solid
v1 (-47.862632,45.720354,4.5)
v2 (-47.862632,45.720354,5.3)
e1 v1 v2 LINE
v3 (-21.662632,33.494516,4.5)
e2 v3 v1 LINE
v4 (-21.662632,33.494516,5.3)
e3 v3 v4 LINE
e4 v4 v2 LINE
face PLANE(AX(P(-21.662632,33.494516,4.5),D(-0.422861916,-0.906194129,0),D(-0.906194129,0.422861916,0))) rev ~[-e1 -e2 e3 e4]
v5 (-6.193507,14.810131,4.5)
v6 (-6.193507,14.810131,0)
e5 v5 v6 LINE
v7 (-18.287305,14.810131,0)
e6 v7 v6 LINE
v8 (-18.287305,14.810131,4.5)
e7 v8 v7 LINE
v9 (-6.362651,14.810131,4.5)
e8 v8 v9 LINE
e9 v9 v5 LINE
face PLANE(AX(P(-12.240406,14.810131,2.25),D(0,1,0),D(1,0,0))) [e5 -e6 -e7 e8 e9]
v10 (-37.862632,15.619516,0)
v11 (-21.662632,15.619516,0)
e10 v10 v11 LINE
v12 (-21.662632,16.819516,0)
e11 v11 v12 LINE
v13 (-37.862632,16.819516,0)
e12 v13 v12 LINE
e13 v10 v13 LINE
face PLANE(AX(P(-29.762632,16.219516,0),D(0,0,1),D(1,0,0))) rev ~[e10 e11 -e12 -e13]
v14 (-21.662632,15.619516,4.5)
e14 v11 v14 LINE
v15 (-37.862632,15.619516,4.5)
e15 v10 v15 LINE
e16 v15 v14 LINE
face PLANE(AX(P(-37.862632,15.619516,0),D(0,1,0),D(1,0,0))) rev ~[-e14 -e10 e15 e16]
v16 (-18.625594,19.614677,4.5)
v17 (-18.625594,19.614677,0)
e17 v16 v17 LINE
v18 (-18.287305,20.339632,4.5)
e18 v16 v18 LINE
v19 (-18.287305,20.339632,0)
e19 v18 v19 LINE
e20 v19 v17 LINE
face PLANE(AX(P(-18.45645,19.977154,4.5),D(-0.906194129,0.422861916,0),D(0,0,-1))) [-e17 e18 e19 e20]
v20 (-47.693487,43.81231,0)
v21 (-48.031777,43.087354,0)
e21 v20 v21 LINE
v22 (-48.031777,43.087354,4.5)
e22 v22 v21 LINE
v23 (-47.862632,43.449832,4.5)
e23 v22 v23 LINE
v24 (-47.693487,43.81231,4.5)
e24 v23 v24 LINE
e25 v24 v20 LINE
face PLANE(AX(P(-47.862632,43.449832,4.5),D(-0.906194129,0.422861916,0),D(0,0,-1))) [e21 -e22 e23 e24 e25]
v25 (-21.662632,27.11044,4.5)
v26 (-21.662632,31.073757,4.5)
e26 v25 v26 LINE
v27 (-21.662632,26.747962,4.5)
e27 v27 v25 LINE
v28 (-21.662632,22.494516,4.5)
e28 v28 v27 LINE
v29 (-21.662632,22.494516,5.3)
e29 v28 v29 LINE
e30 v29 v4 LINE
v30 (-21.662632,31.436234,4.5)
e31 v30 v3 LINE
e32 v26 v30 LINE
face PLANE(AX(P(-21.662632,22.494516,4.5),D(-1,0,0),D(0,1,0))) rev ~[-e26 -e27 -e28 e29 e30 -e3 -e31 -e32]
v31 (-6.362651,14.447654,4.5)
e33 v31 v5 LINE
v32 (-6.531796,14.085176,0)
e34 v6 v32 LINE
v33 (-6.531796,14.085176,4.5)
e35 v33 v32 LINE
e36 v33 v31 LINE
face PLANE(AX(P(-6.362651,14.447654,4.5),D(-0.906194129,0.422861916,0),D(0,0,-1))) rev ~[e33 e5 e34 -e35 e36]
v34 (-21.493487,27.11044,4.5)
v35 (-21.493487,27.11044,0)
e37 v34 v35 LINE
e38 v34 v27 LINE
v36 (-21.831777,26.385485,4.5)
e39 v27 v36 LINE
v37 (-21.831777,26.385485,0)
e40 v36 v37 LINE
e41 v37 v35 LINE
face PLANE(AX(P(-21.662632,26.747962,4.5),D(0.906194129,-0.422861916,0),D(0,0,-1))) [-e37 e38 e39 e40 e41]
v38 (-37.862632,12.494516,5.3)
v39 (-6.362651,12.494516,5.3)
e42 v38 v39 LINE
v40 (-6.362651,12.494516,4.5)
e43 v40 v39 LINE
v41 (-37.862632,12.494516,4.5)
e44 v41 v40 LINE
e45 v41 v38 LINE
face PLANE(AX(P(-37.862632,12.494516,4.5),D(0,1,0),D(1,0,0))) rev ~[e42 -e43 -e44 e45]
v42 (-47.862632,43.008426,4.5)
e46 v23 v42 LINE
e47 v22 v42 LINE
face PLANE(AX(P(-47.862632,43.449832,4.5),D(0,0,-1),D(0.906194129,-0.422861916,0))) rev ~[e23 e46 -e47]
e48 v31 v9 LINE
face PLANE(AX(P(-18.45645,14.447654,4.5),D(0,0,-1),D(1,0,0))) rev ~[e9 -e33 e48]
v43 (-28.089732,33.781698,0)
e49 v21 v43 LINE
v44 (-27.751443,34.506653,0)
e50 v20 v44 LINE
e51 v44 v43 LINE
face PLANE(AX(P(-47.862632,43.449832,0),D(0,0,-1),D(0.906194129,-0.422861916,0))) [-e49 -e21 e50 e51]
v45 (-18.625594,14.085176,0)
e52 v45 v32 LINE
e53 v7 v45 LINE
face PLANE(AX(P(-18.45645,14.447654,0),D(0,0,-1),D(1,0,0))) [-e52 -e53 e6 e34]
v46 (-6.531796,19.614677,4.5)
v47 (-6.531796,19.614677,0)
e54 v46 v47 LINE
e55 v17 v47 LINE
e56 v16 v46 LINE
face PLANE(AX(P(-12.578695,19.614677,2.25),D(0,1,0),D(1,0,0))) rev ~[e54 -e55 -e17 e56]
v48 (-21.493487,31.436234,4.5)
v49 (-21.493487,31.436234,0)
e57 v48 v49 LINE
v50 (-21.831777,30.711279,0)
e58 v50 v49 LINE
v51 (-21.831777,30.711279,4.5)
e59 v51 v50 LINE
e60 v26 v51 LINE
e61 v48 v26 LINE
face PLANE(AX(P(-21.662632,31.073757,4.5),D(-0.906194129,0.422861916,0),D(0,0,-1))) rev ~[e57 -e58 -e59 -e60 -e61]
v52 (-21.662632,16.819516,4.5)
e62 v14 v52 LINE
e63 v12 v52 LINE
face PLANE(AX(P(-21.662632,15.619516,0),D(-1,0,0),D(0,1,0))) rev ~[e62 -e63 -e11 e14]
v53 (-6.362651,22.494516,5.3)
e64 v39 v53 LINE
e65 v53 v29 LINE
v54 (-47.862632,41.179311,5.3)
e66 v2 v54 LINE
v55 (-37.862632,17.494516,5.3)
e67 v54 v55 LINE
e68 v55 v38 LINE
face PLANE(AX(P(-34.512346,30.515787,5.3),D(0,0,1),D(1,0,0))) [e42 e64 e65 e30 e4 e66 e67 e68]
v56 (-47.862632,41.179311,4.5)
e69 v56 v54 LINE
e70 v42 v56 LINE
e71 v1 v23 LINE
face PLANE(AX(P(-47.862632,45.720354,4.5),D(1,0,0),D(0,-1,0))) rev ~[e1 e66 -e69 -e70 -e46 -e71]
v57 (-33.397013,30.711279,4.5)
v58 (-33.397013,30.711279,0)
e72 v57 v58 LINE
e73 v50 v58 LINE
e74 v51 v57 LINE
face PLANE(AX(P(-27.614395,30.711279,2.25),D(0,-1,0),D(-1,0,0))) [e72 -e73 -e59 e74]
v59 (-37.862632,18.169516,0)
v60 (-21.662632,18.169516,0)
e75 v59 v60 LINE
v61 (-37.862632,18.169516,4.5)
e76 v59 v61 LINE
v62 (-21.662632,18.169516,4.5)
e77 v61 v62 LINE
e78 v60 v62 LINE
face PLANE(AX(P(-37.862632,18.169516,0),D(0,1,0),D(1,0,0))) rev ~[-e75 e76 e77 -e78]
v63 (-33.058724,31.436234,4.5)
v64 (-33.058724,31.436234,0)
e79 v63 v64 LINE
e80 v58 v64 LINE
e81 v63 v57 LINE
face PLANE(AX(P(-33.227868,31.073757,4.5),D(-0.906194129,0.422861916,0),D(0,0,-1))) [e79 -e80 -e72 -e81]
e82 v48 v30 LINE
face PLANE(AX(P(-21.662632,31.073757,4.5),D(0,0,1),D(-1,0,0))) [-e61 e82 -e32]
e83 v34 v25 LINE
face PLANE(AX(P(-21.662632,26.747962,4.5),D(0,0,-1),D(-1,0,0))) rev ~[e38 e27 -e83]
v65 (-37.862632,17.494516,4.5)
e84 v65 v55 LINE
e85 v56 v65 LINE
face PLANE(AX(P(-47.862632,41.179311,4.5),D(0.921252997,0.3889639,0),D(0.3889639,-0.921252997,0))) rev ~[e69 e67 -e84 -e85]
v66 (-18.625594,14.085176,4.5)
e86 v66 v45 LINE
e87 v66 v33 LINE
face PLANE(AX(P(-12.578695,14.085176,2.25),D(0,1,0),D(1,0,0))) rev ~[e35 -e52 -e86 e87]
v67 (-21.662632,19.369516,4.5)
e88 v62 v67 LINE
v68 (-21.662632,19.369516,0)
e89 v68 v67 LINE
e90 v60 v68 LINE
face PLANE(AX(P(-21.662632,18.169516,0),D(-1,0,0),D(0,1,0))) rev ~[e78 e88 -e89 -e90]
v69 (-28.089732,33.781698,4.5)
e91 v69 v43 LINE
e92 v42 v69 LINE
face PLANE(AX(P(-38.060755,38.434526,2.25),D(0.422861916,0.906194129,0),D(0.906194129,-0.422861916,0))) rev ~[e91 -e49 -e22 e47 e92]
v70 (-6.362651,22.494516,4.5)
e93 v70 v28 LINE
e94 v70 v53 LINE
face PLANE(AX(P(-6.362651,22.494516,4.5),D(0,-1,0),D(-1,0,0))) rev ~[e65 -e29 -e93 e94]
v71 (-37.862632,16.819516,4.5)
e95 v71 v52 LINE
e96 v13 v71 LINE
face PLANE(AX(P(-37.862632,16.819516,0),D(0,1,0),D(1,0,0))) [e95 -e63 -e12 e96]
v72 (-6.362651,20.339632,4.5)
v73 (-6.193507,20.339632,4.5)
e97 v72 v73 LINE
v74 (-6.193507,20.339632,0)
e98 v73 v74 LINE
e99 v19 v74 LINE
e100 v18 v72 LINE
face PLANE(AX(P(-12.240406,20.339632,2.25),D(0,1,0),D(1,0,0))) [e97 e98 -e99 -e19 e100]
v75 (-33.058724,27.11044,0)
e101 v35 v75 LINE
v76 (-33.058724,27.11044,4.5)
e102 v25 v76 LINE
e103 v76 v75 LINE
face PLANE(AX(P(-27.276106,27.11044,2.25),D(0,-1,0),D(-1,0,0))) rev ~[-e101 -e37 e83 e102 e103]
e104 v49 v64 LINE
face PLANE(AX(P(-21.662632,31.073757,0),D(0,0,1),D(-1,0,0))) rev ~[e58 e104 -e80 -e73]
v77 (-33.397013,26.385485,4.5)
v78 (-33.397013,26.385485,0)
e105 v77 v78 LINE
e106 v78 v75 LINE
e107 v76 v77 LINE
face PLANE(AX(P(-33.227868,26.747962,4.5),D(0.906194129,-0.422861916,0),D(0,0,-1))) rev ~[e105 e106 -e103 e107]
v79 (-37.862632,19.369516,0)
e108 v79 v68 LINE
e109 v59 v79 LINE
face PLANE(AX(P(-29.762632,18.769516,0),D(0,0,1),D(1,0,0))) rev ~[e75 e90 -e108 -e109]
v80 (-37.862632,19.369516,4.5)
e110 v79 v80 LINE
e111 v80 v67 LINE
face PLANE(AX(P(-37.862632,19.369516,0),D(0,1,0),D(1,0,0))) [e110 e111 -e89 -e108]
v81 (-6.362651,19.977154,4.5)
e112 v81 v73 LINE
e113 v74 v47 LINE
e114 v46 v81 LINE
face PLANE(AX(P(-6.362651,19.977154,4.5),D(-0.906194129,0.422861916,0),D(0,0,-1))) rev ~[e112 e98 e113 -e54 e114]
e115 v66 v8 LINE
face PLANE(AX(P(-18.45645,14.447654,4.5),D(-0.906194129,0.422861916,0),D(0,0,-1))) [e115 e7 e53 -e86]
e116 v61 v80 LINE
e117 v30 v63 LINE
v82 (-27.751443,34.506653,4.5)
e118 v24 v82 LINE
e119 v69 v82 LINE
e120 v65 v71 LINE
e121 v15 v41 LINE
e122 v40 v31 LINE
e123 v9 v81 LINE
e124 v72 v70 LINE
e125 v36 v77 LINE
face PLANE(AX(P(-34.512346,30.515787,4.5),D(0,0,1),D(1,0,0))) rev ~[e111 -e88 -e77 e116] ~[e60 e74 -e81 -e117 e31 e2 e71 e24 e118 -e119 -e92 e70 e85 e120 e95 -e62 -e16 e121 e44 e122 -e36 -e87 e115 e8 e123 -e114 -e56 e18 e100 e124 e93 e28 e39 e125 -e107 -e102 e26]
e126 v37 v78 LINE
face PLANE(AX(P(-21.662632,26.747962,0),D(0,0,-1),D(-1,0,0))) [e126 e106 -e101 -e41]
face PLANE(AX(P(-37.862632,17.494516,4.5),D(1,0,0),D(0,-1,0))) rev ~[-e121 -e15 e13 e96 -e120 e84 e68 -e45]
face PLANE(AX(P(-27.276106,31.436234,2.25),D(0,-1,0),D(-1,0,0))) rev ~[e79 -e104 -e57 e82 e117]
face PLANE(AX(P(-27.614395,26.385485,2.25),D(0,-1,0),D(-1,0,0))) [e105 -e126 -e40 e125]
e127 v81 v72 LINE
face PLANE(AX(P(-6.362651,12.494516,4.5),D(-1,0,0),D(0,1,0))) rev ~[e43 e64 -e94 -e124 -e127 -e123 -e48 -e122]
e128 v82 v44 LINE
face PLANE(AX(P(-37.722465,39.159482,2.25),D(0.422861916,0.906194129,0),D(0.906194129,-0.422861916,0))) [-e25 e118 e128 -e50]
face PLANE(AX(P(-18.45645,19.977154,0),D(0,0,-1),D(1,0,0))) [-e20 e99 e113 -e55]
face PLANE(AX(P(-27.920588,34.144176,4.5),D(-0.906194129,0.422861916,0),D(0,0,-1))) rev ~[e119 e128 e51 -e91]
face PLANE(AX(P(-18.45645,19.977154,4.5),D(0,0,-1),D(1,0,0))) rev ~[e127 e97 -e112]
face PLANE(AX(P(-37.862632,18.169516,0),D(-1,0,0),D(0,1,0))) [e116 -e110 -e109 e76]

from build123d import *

# Parameters (mm, degrees)
F0_W     = 16.2
F0_H     = 1.2
F1_DEPTH = 4.5
F2_W     = 16.2
F2_H     = 0.675
F2_H_2   = 1.2
F2_H_3   = 3.125
F3_DEPTH = 0.8
F5_E28_W = 22.0063713977
F5_E28_H = 4.5
F5_E29_W = 12.0937982574
F5_E29_H = 4.5
F5_E30_W = 12.0937982574
F5_E30_H = 4.5
F5_E31_W = 11.5652361646
F5_E31_H = 4.5
F5_E32_W = 11.5652361646
F5_E32_H = 4.5
F6_DEPTH = 0.4


with BuildPart() as f1:
    # F0 (on Top) → F1 (new body)
    with BuildSketch(Plane.XY):
        with Locations((-29.7626322135, 18.7695161968)):
            Rectangle(F0_W, F0_H)
    extrude(amount=F1_DEPTH)



with BuildPart() as f1b:
    # F0 (on Top) → F1, piece 2 (new body)
    with BuildSketch(Plane.XY):
        with Locations((-29.7626322135, 16.2195161968)):
            Rectangle(F0_W, F0_H)
    extrude(amount=F1_DEPTH)


with BuildPart() as f1_1:
    add(f1.part)

    add(f1b.part)  # F3 merges F1b
    # F2 (on face) → F3 (join)
    with BuildSketch(Plane.XY.offset(4.5)):
        Polygon((-47.8626322135, 41.1793105304), (-37.8626322135, 17.4945161968), (-21.6626322135, 17.4945161968), (-21.6626322135, 22.4945161968), (-21.6626322135, 33.4945161968), (-47.8626322135, 45.7203537226), align=None)
        Polygon((-21.6626322135, 22.4945161968), (-21.6626322135, 17.4945161968), (-21.6626322135, 16.8195161968), (-21.6626322135, 15.6195161968), (-21.6626322135, 12.4945161968), (-6.3626514748, 12.4945161968), (-6.3626514748, 22.4945161968), align=None)
        with Locations((-29.7626322135, 17.1570161968)):
            Rectangle(F2_W, F2_H)
        with Locations((-29.7626322135, 16.2195161968)):
            Rectangle(F2_W, F2_H_2)
        with Locations((-29.7626322135, 14.0570161968)):
            Rectangle(F2_W, F2_H_3)
    extrude(amount=F3_DEPTH)

    # F5_E28 (on explicit) + F5_E29 (on explicit) + F5_E30 (on explicit) + F5_E31 (on explicit) + F5_E32 (on explicit) → F6 (join, symmetric)
    with BuildSketch(Plane(origin=(-47.8626322135, 43.4498321265, 4.5), x_dir=(0.9061941294, -0.4228619158, 0), z_dir=(0.4228619158, 0.9061941294, 0))):
        with Locations((11.0031856988, 2.25)):
            Rectangle(F5_E28_W, F5_E28_H)
    with BuildSketch(Plane(origin=(-18.4564497322, 19.9771542102, 4.5), x_dir=(1, 0, 0), z_dir=(0, 1, 0))):
        with Locations((6.0468991287, 2.25)):
            Rectangle(F5_E29_W, F5_E29_H)
    with BuildSketch(Plane(origin=(-18.4564497322, 14.4476536661, 4.5), x_dir=(1, 0, 0), z_dir=(0, 1, 0))):
        with Locations((6.0468991287, 2.25)):
            Rectangle(F5_E30_W, F5_E30_H)
    with BuildSketch(Plane(origin=(-21.6626322135, 31.073756516, 4.5), x_dir=(-1, 0, 0), z_dir=(0, -1, 0))):
        with Locations((5.7826180823, 2.25)):
            Rectangle(F5_E31_W, F5_E31_H)
    with BuildSketch(Plane(origin=(-21.6626322135, 26.7479624599, 4.5), x_dir=(-1, 0, 0), z_dir=(0, -1, 0))):
        with Locations((5.7826180823, 2.25)):
            Rectangle(F5_E32_W, F5_E32_H)
    extrude(amount=F6_DEPTH, both=True, dir=(0.4228619158, 0.9061941294, 0))


solid = f1_1.part
